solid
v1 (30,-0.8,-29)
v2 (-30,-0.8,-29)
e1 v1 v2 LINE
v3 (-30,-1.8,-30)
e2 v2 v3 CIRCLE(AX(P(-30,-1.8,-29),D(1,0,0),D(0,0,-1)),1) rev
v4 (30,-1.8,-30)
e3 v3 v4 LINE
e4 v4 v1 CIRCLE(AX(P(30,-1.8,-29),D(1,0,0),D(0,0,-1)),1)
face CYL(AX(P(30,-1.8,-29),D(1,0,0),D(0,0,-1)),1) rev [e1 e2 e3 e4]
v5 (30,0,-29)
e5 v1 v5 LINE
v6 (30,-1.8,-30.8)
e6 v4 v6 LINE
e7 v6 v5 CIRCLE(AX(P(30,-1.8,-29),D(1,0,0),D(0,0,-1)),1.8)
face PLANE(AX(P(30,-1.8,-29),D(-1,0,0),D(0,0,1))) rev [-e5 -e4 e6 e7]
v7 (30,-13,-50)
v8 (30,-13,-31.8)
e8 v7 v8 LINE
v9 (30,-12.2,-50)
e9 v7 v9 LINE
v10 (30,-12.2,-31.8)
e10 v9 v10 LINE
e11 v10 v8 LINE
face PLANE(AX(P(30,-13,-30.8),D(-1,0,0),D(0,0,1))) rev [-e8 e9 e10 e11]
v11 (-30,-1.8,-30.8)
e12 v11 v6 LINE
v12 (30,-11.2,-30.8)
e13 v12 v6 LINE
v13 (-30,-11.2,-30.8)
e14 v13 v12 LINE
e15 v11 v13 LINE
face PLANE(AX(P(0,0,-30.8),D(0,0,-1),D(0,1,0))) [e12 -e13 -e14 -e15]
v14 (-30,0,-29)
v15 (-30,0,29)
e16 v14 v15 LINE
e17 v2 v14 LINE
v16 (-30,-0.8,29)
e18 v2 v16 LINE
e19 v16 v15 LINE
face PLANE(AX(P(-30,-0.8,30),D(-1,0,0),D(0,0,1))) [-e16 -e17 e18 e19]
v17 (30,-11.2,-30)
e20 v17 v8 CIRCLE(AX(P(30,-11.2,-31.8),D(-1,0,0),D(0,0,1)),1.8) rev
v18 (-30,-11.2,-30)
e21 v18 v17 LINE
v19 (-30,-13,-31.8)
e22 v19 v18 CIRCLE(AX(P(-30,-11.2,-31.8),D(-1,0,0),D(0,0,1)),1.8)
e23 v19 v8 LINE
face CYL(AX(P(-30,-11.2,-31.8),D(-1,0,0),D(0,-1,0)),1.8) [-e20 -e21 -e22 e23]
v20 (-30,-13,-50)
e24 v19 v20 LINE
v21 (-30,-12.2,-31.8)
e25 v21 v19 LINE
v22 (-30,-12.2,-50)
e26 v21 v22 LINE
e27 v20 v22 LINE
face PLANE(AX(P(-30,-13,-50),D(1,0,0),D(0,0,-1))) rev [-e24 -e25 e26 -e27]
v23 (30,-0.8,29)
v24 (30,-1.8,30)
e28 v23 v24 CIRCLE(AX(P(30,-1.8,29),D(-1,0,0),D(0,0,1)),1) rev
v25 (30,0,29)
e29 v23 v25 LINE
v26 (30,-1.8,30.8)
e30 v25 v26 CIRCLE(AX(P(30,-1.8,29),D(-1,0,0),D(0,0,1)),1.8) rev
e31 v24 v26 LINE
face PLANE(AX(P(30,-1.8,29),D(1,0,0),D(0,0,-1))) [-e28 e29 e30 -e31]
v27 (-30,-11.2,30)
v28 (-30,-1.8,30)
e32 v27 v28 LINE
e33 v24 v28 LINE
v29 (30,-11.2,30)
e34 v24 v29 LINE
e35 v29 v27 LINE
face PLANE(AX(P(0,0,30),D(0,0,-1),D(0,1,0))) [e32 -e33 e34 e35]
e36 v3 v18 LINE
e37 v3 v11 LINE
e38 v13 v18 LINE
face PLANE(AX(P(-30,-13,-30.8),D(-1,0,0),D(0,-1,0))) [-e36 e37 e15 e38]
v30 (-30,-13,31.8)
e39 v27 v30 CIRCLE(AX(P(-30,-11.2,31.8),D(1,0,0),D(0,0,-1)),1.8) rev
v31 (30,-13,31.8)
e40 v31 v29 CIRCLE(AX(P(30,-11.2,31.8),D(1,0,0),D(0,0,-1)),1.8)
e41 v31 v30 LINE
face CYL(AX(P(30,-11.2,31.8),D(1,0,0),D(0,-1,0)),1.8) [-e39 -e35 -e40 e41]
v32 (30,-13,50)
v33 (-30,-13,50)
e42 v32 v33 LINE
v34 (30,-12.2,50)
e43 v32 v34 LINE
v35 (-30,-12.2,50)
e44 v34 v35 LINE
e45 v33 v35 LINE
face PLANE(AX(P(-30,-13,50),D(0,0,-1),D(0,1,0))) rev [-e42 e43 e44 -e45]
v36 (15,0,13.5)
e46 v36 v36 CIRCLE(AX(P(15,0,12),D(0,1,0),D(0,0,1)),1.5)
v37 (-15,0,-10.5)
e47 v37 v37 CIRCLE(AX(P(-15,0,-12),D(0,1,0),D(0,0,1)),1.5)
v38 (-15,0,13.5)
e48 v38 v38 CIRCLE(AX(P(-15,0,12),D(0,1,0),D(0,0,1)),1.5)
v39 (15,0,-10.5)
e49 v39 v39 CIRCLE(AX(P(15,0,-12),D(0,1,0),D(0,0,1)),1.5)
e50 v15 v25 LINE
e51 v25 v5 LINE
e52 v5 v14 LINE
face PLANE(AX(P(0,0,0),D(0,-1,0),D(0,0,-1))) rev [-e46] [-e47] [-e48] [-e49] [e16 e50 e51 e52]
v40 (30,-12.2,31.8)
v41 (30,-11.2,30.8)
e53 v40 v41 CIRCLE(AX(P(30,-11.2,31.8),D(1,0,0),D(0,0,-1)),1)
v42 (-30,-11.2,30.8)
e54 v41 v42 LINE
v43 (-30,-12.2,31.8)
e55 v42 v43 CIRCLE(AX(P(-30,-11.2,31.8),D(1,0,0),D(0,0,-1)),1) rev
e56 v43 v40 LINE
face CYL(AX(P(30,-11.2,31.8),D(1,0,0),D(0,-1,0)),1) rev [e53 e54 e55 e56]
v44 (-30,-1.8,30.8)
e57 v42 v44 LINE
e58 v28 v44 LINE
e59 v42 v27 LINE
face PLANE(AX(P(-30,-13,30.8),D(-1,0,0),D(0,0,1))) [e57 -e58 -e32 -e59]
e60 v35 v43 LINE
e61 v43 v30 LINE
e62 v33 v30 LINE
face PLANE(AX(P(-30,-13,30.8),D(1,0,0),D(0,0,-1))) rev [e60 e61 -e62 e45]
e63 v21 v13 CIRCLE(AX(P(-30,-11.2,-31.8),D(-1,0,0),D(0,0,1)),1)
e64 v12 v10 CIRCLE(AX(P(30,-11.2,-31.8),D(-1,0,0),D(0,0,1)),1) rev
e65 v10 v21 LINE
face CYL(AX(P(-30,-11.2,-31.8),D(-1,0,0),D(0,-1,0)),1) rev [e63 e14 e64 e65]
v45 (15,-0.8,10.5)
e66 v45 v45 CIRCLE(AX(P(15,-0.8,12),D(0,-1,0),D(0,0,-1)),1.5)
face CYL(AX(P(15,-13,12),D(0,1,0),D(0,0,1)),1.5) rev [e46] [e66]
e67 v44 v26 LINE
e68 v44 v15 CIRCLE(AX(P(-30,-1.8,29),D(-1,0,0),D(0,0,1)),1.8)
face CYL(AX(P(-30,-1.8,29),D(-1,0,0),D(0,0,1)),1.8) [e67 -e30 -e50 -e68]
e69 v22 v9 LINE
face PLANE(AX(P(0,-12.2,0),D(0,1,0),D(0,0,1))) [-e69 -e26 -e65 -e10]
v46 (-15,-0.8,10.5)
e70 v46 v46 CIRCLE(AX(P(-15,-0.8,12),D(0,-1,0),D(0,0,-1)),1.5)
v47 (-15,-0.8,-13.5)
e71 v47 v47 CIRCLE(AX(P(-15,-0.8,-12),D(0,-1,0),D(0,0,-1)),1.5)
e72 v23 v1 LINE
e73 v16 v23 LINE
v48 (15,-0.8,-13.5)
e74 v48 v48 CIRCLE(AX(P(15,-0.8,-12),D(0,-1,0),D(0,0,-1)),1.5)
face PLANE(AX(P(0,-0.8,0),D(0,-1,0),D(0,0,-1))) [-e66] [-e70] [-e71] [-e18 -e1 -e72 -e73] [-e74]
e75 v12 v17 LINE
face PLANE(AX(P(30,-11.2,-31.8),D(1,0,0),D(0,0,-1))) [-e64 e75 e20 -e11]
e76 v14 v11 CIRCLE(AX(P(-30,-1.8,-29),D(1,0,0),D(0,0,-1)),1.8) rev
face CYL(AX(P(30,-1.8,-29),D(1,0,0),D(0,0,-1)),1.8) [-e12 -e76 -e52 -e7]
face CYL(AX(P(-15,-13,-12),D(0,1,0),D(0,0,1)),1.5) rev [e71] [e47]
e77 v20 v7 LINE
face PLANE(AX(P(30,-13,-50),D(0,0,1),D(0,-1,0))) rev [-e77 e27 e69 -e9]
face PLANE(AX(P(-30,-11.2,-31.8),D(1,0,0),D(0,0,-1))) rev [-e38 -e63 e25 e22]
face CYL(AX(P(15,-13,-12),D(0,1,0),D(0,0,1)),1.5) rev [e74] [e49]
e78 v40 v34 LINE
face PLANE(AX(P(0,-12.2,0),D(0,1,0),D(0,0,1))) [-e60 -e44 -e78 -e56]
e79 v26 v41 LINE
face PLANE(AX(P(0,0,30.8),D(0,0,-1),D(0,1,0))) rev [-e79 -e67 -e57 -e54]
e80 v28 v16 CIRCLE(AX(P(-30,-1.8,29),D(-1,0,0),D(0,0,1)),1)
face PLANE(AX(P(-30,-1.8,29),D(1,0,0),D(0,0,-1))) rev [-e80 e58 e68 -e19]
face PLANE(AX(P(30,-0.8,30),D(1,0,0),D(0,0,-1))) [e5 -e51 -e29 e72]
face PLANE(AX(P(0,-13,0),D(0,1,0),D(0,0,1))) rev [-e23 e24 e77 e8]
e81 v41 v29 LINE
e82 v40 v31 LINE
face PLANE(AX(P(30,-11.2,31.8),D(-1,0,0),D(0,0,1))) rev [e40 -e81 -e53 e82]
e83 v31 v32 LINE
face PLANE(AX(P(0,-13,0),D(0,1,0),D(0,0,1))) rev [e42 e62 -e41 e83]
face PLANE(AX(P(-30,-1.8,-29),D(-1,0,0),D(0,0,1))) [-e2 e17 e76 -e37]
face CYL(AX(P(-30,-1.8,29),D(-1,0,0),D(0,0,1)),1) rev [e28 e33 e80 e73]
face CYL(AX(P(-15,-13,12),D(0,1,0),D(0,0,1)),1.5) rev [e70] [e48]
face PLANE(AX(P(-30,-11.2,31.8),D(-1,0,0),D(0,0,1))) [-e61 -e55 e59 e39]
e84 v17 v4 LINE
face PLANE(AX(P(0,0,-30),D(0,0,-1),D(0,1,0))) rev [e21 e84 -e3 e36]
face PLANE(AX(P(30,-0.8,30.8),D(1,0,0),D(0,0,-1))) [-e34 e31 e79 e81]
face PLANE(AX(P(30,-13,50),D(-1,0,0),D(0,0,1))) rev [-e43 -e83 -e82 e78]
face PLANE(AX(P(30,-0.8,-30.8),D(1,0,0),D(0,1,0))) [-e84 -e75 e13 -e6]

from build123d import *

# Parameters (mm, degrees)
SKETCH7_W                      = 60
SKETCH7_H                      = 60
BASE_FLANGE2_DEPTH             = 0.8
EDGE_FLANGE1_STRIP_W           = 5.2
EDGE_FLANGE1_STRIP_H           = 0.8
EDGE_FLANGE1_STRIP_CUT_DEPTH   = 60
EDGE_FLANGE1_STRIP_2_W         = 5.2
EDGE_FLANGE1_STRIP_2_H         = 0.8
EDGE_FLANGE1_STRIP_CUT_2_DEPTH = 60
EDGE_FLANGE1_DEPTH             = 60
EDGE_FLANGE1_BEND_DEPTH        = 60
EDGE_FLANGE2_STRIP_W           = 5.2
EDGE_FLANGE2_STRIP_H           = 0.8
EDGE_FLANGE2_STRIP_CUT_DEPTH   = 60
EDGE_FLANGE2_STRIP_2_W         = 5.2
EDGE_FLANGE2_STRIP_2_H         = 0.8
EDGE_FLANGE2_STRIP_CUT_2_DEPTH = 60
EDGE_FLANGE2_DEPTH             = 60
EDGE_FLANGE2_BEND_DEPTH        = 60
SKETCH22_R                     = 1.5
CUT_EXTRUDE2_DEPTH             = 60.741108125


# Sheet-metal steps are written as plain solids
with BuildPart() as part:
    # Sketch7 → Base-Flange2 (new body)
    with BuildSketch(Plane(origin=(0, 0, 0), x_dir=(1, 0, 0), z_dir=(0, 1, 0))):
        Rectangle(SKETCH7_W, SKETCH7_H)
    extrude(amount=-BASE_FLANGE2_DEPTH)

    # Edge-Flange1 strip (across the edge) → Edge-Flange1 strip cut (cut)
    with BuildSketch(Plane(origin=(-30, -0.8, -30), x_dir=(0, 0, 1), z_dir=(1, 0, 0))):
        with Locations((-1.6, -0.4)):
            Rectangle(EDGE_FLANGE1_STRIP_W, EDGE_FLANGE1_STRIP_H)
    extrude(amount=EDGE_FLANGE1_STRIP_CUT_DEPTH, mode=Mode.SUBTRACT)

    # Edge-Flange1 strip 2 (across the edge) → Edge-Flange1 strip cut 2 (cut)
    with BuildSketch(Plane(origin=(30, -0.8, 30), x_dir=(0, 0, -1), z_dir=(-1, 0, 0))):
        with Locations((-1.6, -0.4)):
            Rectangle(EDGE_FLANGE1_STRIP_2_W, EDGE_FLANGE1_STRIP_2_H)
    extrude(amount=EDGE_FLANGE1_STRIP_CUT_2_DEPTH, mode=Mode.SUBTRACT)

    # Edge-Flange1 section (across the edge) → Edge-Flange1 (add)
    with BuildSketch(Plane(origin=(-30, -0.8, -30), x_dir=(0, 0, 1), z_dir=(1, 0, 0))):
        with BuildLine():
            Line((-0.8, 1), (-0.8, 12.2))
            Line((-0.8, 12.2), (0, 12.2))
            Line((0, 12.2), (0, 1))
            ThreePointArc((0, 1), (0.292893219, 0.292893219), (1, 0))
            Line((1, 0), (1, -0.8))
            ThreePointArc((1, -0.8), (-0.272792206, -0.272792206), (-0.8, 1))
        make_face()
    extrude(amount=EDGE_FLANGE1_DEPTH)

    # Edge-Flange1 section 2 (across the edge) → Edge-Flange1 bend (add)
    with BuildSketch(Plane(origin=(30, -0.8, 30), x_dir=(0, 0, -1), z_dir=(-1, 0, 0))):
        with BuildLine():
            Line((-0.8, 1), (-0.8, 12.2))
            Line((-0.8, 12.2), (0, 12.2))
            Line((0, 12.2), (0, 1))
            ThreePointArc((0, 1), (0.292893219, 0.292893219), (1, 0))
            Line((1, 0), (1, -0.8))
            ThreePointArc((1, -0.8), (-0.272792206, -0.272792206), (-0.8, 1))
        make_face()
    extrude(amount=EDGE_FLANGE1_BEND_DEPTH)

    # Edge-Flange2 strip (across the edge) → Edge-Flange2 strip cut (cut)
    with BuildSketch(Plane(origin=(-30, -13, 30.8), x_dir=(0, 1, 0), z_dir=(1, 0, 0))):
        with Locations((-0.8, -0.4)):
            Rectangle(EDGE_FLANGE2_STRIP_W, EDGE_FLANGE2_STRIP_H)
    extrude(amount=EDGE_FLANGE2_STRIP_CUT_DEPTH, mode=Mode.SUBTRACT)

    # Edge-Flange2 strip 2 (across the edge) → Edge-Flange2 strip cut 2 (cut)
    with BuildSketch(Plane(origin=(30, -13, -30.8), x_dir=(0, 1, 0), z_dir=(-1, 0, 0))):
        with Locations((-0.8, -0.4)):
            Rectangle(EDGE_FLANGE2_STRIP_2_W, EDGE_FLANGE2_STRIP_2_H)
    extrude(amount=EDGE_FLANGE2_STRIP_CUT_2_DEPTH, mode=Mode.SUBTRACT)

    # Edge-Flange2 section (across the edge) → Edge-Flange2 (add)
    with BuildSketch(Plane(origin=(-30, -13, 30.8), x_dir=(0, 1, 0), z_dir=(1, 0, 0))):
        with BuildLine():
            Line((0, 1), (0, 19.2))
            Line((0, 19.2), (0.8, 19.2))
            Line((0.8, 19.2), (0.8, 1))
            ThreePointArc((0.8, 1), (1.092893219, 0.292893219), (1.8, 0))
            Line((1.8, 0), (1.8, -0.8))
            ThreePointArc((1.8, -0.8), (0.527207794, -0.272792206), (0, 1))
        make_face()
    extrude(amount=EDGE_FLANGE2_DEPTH)

    # Edge-Flange2 section 2 (across the edge) → Edge-Flange2 bend (add)
    with BuildSketch(Plane(origin=(30, -13, -30.8), x_dir=(0, 1, 0), z_dir=(-1, 0, 0))):
        with BuildLine():
            Line((0, 1), (0, 19.2))
            Line((0, 19.2), (0.8, 19.2))
            Line((0.8, 19.2), (0.8, 1))
            ThreePointArc((0.8, 1), (1.092893219, 0.292893219), (1.8, 0))
            Line((1.8, 0), (1.8, -0.8))
            ThreePointArc((1.8, -0.8), (0.527207794, -0.272792206), (0, 1))
        make_face()
    extrude(amount=EDGE_FLANGE2_BEND_DEPTH)

    # Sketch22 → Cut-Extrude2 (cut, through all)
    with BuildSketch(Plane(origin=(0, 0, 0), x_dir=(1, 0, 0), z_dir=(0, 1, 0))):
        with Locations(Location((-15, 12, 0), (0, 0, 270))):
            Circle(SKETCH22_R)
        with Locations(Location((15, 12, 0), (0, 0, 270))):
            Circle(SKETCH22_R)
        with Locations(Location((15, -12, 0), (0, 0, 270))):
            Circle(SKETCH22_R)
        with Locations(Location((-15, -12, 0), (0, 0, 270))):
            Circle(SKETCH22_R)
    extrude(amount=-CUT_EXTRUDE2_DEPTH, mode=Mode.SUBTRACT)


solid = part.part
